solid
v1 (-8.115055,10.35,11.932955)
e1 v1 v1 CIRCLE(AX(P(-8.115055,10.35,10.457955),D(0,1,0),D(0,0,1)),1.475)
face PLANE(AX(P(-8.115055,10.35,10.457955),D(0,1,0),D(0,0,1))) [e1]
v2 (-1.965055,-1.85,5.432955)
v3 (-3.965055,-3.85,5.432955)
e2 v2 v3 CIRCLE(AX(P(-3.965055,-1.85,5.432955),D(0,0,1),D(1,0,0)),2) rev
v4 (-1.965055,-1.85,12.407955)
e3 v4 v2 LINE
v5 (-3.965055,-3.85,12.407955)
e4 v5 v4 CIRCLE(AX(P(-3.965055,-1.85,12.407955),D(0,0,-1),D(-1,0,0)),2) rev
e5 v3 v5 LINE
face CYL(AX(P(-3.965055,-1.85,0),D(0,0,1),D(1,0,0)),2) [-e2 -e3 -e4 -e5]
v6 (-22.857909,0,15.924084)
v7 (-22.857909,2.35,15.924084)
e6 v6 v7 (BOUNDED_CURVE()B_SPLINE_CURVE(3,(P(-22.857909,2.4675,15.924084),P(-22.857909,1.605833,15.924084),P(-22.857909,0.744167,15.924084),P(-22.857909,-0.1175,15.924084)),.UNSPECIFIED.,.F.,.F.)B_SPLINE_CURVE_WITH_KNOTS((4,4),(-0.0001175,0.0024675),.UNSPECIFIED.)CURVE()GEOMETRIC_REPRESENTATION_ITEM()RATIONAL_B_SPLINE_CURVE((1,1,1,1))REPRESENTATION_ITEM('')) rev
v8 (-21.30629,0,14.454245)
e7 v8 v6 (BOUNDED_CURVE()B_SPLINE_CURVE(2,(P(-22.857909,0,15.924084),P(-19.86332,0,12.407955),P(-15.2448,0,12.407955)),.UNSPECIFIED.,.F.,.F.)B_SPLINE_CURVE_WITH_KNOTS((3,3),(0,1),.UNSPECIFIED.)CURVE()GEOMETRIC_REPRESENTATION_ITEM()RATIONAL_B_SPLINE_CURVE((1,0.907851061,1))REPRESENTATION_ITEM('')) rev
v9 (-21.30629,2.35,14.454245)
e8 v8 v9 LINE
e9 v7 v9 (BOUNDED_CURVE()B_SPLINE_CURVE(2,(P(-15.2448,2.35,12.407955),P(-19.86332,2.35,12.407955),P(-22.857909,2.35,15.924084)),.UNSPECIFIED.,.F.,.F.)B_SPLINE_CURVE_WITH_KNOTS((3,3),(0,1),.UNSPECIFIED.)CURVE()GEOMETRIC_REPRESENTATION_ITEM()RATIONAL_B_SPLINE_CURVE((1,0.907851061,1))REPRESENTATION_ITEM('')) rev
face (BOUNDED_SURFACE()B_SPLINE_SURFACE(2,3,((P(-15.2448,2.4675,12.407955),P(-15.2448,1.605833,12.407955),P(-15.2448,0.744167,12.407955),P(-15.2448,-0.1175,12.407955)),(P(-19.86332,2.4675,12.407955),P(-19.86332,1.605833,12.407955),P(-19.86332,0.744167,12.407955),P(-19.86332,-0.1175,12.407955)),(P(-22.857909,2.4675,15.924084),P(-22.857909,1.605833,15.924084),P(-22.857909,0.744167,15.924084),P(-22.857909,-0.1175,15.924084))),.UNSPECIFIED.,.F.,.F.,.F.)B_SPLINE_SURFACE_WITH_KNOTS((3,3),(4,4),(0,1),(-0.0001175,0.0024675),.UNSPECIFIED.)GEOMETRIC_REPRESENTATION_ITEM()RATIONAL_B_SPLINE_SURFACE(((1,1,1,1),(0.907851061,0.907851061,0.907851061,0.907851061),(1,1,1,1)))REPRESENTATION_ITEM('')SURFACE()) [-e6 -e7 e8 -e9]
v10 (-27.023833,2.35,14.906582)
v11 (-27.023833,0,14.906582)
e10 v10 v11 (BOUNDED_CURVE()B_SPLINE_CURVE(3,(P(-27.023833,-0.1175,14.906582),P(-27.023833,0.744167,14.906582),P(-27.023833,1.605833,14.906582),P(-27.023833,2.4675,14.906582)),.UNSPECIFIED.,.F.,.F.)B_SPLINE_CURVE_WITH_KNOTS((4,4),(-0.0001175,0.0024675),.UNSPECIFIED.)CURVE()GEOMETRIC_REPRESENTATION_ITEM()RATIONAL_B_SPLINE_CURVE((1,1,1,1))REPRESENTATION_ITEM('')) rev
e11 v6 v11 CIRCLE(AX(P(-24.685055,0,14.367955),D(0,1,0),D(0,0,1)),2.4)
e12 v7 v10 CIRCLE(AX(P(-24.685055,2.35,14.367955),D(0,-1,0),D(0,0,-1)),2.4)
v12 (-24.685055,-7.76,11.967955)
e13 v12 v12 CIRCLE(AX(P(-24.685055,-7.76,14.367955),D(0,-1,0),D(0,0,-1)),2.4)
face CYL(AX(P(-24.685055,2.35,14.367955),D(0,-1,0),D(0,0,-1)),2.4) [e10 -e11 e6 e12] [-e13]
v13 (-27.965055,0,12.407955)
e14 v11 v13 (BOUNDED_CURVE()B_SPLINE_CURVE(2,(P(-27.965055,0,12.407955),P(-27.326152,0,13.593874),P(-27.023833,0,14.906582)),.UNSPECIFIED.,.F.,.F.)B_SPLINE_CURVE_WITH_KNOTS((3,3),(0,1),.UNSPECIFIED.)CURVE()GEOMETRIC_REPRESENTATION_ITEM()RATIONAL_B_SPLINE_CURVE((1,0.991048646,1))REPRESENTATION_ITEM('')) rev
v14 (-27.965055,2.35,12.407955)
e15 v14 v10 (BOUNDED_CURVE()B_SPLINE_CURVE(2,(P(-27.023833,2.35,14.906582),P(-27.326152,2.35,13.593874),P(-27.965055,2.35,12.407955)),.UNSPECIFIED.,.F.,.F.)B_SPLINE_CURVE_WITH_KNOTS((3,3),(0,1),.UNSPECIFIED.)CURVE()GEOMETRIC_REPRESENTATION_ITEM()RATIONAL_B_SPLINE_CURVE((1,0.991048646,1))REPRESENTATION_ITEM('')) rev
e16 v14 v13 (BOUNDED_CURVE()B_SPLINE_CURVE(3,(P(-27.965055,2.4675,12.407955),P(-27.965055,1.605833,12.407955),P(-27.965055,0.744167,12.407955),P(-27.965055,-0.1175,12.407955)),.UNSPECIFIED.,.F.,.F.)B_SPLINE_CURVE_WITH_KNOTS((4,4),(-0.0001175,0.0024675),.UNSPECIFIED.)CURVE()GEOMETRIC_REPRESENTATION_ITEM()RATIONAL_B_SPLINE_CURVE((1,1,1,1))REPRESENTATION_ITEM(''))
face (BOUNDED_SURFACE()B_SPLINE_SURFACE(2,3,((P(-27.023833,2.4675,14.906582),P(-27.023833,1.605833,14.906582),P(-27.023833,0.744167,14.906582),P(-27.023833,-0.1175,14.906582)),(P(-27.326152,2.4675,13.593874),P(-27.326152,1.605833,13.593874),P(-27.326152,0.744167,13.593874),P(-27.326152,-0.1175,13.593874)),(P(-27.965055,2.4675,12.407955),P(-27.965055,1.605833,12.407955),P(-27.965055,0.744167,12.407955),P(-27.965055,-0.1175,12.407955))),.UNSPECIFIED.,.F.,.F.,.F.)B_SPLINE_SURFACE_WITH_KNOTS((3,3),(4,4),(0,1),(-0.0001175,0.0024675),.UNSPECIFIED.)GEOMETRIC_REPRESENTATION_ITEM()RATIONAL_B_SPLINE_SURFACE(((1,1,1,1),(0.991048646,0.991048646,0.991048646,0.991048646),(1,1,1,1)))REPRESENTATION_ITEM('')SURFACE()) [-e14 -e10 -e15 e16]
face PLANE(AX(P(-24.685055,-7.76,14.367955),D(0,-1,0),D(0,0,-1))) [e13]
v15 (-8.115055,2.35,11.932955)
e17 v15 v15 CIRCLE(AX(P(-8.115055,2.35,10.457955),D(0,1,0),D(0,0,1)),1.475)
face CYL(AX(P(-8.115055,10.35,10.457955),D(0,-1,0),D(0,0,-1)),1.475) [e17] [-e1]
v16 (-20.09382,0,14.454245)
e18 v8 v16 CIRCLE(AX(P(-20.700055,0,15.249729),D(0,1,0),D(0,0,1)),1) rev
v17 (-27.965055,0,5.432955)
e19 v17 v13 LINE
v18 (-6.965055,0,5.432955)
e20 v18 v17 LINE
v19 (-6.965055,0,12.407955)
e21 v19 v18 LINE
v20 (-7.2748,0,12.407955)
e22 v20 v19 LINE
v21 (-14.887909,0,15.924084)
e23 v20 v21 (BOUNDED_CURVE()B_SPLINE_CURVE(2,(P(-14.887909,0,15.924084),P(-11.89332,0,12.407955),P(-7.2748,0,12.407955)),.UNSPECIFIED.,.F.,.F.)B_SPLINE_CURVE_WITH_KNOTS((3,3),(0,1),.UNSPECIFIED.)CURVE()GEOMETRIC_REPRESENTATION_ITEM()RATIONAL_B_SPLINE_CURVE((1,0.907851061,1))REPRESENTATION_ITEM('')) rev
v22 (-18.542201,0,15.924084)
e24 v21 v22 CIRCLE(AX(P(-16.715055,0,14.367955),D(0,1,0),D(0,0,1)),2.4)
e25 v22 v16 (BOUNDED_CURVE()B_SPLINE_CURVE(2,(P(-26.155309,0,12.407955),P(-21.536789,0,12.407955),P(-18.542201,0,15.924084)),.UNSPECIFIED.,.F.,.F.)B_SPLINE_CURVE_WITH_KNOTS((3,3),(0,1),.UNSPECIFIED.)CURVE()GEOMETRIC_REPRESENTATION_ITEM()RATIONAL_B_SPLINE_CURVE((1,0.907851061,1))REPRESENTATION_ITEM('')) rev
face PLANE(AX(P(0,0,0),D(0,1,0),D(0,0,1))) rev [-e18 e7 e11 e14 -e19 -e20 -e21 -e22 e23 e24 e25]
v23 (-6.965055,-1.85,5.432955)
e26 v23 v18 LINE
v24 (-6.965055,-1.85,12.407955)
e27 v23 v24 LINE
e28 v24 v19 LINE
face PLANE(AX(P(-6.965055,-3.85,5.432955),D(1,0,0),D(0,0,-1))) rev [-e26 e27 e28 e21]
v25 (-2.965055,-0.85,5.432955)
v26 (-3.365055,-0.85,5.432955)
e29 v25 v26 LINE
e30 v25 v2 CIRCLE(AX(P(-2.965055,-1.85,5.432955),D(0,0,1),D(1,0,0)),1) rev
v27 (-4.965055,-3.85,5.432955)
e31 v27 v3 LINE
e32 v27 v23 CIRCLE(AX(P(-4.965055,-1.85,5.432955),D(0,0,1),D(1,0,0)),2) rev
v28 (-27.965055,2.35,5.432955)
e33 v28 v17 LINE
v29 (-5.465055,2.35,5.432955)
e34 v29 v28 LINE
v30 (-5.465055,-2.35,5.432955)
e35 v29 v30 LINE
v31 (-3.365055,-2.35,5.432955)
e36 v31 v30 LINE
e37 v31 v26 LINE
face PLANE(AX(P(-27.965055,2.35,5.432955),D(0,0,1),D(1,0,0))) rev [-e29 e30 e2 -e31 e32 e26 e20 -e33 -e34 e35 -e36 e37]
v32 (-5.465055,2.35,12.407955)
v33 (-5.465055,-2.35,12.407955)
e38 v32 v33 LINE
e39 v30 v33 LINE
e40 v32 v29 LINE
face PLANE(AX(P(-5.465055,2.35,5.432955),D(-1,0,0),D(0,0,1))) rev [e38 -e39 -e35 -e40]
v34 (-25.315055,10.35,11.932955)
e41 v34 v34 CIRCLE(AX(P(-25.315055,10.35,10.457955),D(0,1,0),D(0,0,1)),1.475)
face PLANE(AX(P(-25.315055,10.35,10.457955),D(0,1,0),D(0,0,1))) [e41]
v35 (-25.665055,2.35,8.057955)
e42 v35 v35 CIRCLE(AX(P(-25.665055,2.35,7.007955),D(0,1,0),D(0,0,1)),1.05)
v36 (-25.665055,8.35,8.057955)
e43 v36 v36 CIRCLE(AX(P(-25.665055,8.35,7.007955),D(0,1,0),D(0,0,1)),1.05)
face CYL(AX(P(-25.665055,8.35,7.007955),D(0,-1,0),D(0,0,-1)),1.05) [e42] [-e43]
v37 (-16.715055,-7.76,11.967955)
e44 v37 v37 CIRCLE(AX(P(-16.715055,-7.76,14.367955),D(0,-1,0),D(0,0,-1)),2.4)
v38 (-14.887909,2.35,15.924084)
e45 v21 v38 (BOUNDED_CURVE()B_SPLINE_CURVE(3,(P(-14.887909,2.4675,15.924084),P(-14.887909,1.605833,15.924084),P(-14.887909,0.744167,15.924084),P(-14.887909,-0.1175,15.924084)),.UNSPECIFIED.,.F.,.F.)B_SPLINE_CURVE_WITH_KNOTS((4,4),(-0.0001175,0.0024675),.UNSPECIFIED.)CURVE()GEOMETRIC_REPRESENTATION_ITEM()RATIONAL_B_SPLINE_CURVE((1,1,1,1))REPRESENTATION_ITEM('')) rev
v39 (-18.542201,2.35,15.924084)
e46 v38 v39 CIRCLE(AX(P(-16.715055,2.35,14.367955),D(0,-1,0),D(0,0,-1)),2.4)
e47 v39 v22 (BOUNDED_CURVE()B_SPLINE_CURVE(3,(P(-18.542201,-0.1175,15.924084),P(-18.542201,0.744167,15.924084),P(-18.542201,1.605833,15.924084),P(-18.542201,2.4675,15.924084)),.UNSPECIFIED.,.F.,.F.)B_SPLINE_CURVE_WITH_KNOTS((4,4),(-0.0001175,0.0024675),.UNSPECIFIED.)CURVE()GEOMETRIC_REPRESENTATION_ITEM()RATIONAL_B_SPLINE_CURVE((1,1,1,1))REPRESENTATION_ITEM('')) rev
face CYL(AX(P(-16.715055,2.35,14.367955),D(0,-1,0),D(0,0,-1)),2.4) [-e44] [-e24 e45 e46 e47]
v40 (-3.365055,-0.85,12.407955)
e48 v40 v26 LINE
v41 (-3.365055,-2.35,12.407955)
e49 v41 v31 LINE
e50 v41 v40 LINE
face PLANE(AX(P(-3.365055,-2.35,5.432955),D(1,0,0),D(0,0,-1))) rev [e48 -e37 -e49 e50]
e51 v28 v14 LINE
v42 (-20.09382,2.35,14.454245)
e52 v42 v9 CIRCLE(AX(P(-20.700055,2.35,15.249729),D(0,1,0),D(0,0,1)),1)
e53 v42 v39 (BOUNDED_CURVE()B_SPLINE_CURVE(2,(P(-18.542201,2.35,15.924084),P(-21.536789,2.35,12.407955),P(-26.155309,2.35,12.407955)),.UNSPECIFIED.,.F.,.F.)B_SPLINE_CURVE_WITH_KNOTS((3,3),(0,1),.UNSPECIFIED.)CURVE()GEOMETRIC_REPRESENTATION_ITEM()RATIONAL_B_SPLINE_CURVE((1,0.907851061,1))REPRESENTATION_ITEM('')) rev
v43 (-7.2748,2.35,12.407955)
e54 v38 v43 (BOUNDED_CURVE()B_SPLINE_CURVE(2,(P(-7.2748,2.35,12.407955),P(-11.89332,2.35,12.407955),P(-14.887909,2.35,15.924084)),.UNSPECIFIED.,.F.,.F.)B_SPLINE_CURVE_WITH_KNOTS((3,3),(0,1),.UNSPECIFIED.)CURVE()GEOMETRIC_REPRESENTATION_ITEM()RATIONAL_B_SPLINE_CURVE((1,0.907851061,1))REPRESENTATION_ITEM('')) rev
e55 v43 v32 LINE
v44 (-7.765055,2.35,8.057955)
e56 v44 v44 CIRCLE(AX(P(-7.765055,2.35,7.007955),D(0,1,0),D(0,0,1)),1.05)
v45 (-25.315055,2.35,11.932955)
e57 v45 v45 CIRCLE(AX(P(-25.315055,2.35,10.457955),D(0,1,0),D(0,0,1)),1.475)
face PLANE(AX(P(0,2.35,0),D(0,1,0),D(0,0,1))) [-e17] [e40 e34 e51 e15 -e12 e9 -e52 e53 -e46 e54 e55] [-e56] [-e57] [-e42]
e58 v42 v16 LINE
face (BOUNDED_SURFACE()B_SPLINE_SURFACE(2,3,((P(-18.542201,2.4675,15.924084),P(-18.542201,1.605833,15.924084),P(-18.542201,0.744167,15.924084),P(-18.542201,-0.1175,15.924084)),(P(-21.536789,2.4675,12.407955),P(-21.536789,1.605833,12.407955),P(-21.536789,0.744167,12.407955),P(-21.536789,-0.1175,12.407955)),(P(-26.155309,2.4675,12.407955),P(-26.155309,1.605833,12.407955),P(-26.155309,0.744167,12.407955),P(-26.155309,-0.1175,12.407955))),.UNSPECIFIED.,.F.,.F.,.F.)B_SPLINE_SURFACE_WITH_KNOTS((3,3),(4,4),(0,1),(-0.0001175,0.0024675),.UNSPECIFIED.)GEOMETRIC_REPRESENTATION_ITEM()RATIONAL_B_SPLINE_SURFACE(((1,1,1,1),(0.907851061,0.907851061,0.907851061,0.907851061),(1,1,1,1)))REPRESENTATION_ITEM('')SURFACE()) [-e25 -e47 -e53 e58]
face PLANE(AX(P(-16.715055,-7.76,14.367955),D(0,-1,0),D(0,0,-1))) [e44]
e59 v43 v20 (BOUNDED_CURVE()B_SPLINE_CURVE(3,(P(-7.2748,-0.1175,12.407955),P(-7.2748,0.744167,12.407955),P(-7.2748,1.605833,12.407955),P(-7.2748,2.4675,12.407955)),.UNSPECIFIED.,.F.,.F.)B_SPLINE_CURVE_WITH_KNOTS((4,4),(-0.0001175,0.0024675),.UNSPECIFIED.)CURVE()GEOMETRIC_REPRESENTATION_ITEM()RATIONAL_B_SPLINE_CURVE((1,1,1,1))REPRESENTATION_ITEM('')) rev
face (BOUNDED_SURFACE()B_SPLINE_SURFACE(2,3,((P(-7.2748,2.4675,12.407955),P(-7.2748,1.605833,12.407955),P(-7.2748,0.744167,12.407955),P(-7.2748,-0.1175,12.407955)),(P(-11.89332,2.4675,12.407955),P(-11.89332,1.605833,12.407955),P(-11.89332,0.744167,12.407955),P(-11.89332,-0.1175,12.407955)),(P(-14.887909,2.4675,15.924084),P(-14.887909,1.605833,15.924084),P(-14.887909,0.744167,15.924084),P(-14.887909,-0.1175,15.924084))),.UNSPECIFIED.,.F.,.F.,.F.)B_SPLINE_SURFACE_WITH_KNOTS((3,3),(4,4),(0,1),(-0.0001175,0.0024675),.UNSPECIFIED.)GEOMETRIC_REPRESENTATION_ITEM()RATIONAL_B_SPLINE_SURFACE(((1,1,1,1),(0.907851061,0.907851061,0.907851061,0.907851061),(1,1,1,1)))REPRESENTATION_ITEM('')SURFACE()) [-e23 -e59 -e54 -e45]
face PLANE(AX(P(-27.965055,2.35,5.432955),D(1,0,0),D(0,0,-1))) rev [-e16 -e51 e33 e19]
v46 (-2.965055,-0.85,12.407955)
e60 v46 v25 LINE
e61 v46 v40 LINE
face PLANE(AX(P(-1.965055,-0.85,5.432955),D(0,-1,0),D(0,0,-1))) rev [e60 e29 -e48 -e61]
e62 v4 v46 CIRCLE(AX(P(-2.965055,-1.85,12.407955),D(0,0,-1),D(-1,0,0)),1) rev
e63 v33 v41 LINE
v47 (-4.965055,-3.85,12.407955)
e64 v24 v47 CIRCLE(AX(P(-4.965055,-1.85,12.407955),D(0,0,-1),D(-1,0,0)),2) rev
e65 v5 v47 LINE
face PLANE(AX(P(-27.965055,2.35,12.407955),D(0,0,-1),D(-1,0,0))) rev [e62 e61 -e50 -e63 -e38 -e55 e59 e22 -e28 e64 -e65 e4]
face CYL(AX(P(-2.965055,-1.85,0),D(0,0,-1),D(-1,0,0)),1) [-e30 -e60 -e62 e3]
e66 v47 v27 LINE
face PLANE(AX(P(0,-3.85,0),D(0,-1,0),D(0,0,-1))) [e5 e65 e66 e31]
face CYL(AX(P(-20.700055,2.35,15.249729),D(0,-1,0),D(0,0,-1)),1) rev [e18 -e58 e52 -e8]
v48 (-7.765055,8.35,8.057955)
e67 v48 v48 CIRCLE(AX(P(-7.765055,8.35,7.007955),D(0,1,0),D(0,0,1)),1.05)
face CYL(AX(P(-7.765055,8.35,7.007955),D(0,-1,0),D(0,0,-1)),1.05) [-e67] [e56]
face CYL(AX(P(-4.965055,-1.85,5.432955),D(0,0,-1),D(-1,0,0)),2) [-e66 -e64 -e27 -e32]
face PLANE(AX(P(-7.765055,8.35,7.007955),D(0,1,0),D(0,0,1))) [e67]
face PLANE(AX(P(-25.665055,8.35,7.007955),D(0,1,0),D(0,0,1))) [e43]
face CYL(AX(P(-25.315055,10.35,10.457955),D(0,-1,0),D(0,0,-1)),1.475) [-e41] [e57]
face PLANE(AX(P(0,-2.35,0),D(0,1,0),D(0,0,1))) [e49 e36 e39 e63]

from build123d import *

# Parameters (mm, degrees)
SKETCH1_W                = 22.5
SKETCH1_H                = 6.975
BOSS_EXTRUDE1_DEPTH      = 2.35
SKETCH2_R                = 1.475
BOSS_EXTRUDE2_DEPTH      = 8
SKETCH3_W                = 1.5
SKETCH3_H                = 6.975
BOSS_EXTRUDE3_DEPTH      = 3.85
SKETCH4_W                = 6.975
SKETCH4_H                = 3
BOSS_EXTRUDE4_DEPTH      = 3.5
SKETCH5_W                = 2.1
SKETCH5_H                = 6.975
CUT_EXTRUDE1_DEPTH       = 1.5
SKETCH6_R                = 1.05
BOSS_EXTRUDE5_DEPTH      = 6
BOSS_EXTRUDE9_DEPTH      = 7.76
BOSS_EXTRUDE9_DEPTH_BACK = 2.35
SKETCH7_R                = 2.4
FILLET1_R                = 2
FILLET2_R                = 2
FILLET3_R                = 1
FILLET4_DEPTH            = 2.35
FILLET5_R                = 1


with BuildPart() as part:
    # Sketch1 → Boss-Extrude1 (new body)
    with BuildSketch(Plane(origin=(0, 0, 0), x_dir=(1, 0, 0), z_dir=(0, 1, 0))):
        with Locations((-16.71505467, -8.920455339)):
            Rectangle(SKETCH1_W, SKETCH1_H)
    extrude(amount=BOSS_EXTRUDE1_DEPTH)

    # Sketch2 → Boss-Extrude2 (add)
    with BuildSketch(Plane(origin=(0, 2.35, 0), x_dir=(1, 0, 0), z_dir=(0, 1, 0))):
        with Locations(Location((-25.31505467, -10.457955339, 0), (0, 0, 270))):
            Circle(SKETCH2_R)
        with Locations(Location((-8.11505467, -10.457955339, 0), (0, 0, 270))):
            Circle(SKETCH2_R)
    extrude(amount=BOSS_EXTRUDE2_DEPTH)

    # Sketch3 → Boss-Extrude3 (add)
    with BuildSketch(Plane(origin=(0, 0, 0), x_dir=(-1, 0, 0), z_dir=(0, -1, 0))):
        with Locations((6.21505467, -8.920455339)):
            Rectangle(SKETCH3_W, SKETCH3_H)
    extrude(amount=BOSS_EXTRUDE3_DEPTH)

    # Sketch4 → Boss-Extrude4 (add)
    with BuildSketch(Plane(origin=(-5.46505467, 0, 0), x_dir=(0, 0, -1), z_dir=(1, 0, 0))):
        with Locations((-8.920455339, -2.35)):
            Rectangle(SKETCH4_W, SKETCH4_H)
    extrude(amount=BOSS_EXTRUDE4_DEPTH)

    # Sketch5 → Cut-Extrude1 (cut)
    with BuildSketch(Plane(origin=(0, -0.85, 0), x_dir=(1, 0, 0), z_dir=(0, 1, 0))):
        with Locations((-4.41505467, -8.920455339)):
            Rectangle(SKETCH5_W, SKETCH5_H)
    extrude(amount=-CUT_EXTRUDE1_DEPTH, mode=Mode.SUBTRACT)

    # Sketch6 → Boss-Extrude5 (add)
    with BuildSketch(Plane(origin=(0, 2.35, 0), x_dir=(1, 0, 0), z_dir=(0, 1, 0))):
        with Locations(Location((-7.76505467, -7.007955339, 0), (0, 0, 270))):
            Circle(SKETCH6_R)
        with Locations(Location((-25.66505467, -7.007955339, 0), (0, 0, 270))):
            Circle(SKETCH6_R)
    extrude(amount=BOSS_EXTRUDE5_DEPTH)

    # Sketch7 → Boss-Extrude9 (add, two sides: drawn at the far end of the back side and taken through both)
    with BuildSketch(Plane(origin=(0, 0, 0), x_dir=(-1, 0, 0), z_dir=(0, -1, 0)).offset(-BOSS_EXTRUDE9_DEPTH_BACK)):
        with Locations(Location((16.71505467, -14.367955339, 0), (0, 0, 90))):
            Circle(SKETCH7_R)
        with Locations(Location((24.68505467, -14.367955339, 0), (0, 0, 90))):
            Circle(SKETCH7_R)
    extrude(amount=BOSS_EXTRUDE9_DEPTH + BOSS_EXTRUDE9_DEPTH_BACK)

    # Fillet1
    fillet1_edges = [part.edges().sort_by_distance(p)[0] for p in [
        (-6.96505467, -3.85, 8.920455339),
    ]]
    fillet(fillet1_edges, radius=FILLET1_R)

    # Fillet2
    fillet2_edges = [part.edges().sort_by_distance(p)[0] for p in [
        (-1.96505467, -3.85, 8.920455339),
    ]]
    fillet(fillet2_edges, radius=FILLET2_R)

    # Fillet3
    fillet3_edges = [part.edges().sort_by_distance(p)[0] for p in [
        (-1.96505467, -0.85, 8.920455339),
    ]]
    fillet(fillet3_edges, radius=FILLET3_R - 0.0001)  # a hair under: the kernel refuses the full size

    # Fillet4: read off the stored shape, not the designer's step
    # Fillet4 outline → Fillet4 (add)
    with BuildSketch(Plane(origin=(0, 0, 0), x_dir=(1, 0, 0), z_dir=(0, 1, 0))):
        with BuildLine():
            add(Edge.make_bspline(
                [(-7.274800436, -12.407955339), (-11.89332012, -12.407955339), (-14.887908689, -15.924084371)],
                knots=[0, 0, 0, 1, 1, 1], degree=2, weights=[1, 0.907851061, 1]))
            Line((-7.274800436, -12.407955339), (-15.329991494, -12.407955339))
            ThreePointArc((-15.329991494, -12.407955339), (-14.333802319, -14.068560547), (-14.887908689, -15.924084371))
        make_face()
        with BuildLine():
            add(Edge.make_bspline(
                [(-18.54220065, -15.924084371), (-19.483433236, -14.818925802), (-20.700054672, -14.027012596)],
                knots=[0, 0, 0, 0.335510555, 0.335510555, 0.335510555], degree=2, weights=[1, 0.969083058, 0.958912037]))
            ThreePointArc((-18.54220065, -15.924084371), (-19.096307021, -14.068560547), (-18.100117845, -12.407955339))
            Line((-18.100117845, -12.407955339), (-23.299991494, -12.407955339))
            ThreePointArc((-23.299991494, -12.407955339), (-22.303802319, -14.068560547), (-22.857908689, -15.924084371))
            add(Edge.make_bspline(
                [(-20.700054672, -14.027012596), (-21.916676104, -14.818925803), (-22.857908689, -15.924084371)],
                knots=[0.664489445, 0.664489445, 0.664489445, 1, 1, 1], degree=2, weights=[0.958912037, 0.969083058, 1]))
        make_face()
        with BuildLine():
            ThreePointArc((-27.023832507, -14.906581581), (-26.92727037, -13.512111455), (-26.070117845, -12.407955339))
            Line((-26.070117845, -12.407955339), (-27.96505467, -12.407955339))
            add(Edge.make_bspline(
                [(-27.023832507, -14.906581581), (-27.326152305, -13.59387383), (-27.96505467, -12.407955339)],
                knots=[0, 0, 0, 1, 1, 1], degree=2, weights=[1, 0.991048646, 1]))
        make_face()
    extrude(amount=FILLET4_DEPTH)

    # Fillet5
    fillet5_edges = [part.edges().sort_by_distance(p)[0] for p in [
        (-20.700054672, 1.175, 14.027012596),
    ]]
    fillet(fillet5_edges, radius=FILLET5_R)


solid = part.part
